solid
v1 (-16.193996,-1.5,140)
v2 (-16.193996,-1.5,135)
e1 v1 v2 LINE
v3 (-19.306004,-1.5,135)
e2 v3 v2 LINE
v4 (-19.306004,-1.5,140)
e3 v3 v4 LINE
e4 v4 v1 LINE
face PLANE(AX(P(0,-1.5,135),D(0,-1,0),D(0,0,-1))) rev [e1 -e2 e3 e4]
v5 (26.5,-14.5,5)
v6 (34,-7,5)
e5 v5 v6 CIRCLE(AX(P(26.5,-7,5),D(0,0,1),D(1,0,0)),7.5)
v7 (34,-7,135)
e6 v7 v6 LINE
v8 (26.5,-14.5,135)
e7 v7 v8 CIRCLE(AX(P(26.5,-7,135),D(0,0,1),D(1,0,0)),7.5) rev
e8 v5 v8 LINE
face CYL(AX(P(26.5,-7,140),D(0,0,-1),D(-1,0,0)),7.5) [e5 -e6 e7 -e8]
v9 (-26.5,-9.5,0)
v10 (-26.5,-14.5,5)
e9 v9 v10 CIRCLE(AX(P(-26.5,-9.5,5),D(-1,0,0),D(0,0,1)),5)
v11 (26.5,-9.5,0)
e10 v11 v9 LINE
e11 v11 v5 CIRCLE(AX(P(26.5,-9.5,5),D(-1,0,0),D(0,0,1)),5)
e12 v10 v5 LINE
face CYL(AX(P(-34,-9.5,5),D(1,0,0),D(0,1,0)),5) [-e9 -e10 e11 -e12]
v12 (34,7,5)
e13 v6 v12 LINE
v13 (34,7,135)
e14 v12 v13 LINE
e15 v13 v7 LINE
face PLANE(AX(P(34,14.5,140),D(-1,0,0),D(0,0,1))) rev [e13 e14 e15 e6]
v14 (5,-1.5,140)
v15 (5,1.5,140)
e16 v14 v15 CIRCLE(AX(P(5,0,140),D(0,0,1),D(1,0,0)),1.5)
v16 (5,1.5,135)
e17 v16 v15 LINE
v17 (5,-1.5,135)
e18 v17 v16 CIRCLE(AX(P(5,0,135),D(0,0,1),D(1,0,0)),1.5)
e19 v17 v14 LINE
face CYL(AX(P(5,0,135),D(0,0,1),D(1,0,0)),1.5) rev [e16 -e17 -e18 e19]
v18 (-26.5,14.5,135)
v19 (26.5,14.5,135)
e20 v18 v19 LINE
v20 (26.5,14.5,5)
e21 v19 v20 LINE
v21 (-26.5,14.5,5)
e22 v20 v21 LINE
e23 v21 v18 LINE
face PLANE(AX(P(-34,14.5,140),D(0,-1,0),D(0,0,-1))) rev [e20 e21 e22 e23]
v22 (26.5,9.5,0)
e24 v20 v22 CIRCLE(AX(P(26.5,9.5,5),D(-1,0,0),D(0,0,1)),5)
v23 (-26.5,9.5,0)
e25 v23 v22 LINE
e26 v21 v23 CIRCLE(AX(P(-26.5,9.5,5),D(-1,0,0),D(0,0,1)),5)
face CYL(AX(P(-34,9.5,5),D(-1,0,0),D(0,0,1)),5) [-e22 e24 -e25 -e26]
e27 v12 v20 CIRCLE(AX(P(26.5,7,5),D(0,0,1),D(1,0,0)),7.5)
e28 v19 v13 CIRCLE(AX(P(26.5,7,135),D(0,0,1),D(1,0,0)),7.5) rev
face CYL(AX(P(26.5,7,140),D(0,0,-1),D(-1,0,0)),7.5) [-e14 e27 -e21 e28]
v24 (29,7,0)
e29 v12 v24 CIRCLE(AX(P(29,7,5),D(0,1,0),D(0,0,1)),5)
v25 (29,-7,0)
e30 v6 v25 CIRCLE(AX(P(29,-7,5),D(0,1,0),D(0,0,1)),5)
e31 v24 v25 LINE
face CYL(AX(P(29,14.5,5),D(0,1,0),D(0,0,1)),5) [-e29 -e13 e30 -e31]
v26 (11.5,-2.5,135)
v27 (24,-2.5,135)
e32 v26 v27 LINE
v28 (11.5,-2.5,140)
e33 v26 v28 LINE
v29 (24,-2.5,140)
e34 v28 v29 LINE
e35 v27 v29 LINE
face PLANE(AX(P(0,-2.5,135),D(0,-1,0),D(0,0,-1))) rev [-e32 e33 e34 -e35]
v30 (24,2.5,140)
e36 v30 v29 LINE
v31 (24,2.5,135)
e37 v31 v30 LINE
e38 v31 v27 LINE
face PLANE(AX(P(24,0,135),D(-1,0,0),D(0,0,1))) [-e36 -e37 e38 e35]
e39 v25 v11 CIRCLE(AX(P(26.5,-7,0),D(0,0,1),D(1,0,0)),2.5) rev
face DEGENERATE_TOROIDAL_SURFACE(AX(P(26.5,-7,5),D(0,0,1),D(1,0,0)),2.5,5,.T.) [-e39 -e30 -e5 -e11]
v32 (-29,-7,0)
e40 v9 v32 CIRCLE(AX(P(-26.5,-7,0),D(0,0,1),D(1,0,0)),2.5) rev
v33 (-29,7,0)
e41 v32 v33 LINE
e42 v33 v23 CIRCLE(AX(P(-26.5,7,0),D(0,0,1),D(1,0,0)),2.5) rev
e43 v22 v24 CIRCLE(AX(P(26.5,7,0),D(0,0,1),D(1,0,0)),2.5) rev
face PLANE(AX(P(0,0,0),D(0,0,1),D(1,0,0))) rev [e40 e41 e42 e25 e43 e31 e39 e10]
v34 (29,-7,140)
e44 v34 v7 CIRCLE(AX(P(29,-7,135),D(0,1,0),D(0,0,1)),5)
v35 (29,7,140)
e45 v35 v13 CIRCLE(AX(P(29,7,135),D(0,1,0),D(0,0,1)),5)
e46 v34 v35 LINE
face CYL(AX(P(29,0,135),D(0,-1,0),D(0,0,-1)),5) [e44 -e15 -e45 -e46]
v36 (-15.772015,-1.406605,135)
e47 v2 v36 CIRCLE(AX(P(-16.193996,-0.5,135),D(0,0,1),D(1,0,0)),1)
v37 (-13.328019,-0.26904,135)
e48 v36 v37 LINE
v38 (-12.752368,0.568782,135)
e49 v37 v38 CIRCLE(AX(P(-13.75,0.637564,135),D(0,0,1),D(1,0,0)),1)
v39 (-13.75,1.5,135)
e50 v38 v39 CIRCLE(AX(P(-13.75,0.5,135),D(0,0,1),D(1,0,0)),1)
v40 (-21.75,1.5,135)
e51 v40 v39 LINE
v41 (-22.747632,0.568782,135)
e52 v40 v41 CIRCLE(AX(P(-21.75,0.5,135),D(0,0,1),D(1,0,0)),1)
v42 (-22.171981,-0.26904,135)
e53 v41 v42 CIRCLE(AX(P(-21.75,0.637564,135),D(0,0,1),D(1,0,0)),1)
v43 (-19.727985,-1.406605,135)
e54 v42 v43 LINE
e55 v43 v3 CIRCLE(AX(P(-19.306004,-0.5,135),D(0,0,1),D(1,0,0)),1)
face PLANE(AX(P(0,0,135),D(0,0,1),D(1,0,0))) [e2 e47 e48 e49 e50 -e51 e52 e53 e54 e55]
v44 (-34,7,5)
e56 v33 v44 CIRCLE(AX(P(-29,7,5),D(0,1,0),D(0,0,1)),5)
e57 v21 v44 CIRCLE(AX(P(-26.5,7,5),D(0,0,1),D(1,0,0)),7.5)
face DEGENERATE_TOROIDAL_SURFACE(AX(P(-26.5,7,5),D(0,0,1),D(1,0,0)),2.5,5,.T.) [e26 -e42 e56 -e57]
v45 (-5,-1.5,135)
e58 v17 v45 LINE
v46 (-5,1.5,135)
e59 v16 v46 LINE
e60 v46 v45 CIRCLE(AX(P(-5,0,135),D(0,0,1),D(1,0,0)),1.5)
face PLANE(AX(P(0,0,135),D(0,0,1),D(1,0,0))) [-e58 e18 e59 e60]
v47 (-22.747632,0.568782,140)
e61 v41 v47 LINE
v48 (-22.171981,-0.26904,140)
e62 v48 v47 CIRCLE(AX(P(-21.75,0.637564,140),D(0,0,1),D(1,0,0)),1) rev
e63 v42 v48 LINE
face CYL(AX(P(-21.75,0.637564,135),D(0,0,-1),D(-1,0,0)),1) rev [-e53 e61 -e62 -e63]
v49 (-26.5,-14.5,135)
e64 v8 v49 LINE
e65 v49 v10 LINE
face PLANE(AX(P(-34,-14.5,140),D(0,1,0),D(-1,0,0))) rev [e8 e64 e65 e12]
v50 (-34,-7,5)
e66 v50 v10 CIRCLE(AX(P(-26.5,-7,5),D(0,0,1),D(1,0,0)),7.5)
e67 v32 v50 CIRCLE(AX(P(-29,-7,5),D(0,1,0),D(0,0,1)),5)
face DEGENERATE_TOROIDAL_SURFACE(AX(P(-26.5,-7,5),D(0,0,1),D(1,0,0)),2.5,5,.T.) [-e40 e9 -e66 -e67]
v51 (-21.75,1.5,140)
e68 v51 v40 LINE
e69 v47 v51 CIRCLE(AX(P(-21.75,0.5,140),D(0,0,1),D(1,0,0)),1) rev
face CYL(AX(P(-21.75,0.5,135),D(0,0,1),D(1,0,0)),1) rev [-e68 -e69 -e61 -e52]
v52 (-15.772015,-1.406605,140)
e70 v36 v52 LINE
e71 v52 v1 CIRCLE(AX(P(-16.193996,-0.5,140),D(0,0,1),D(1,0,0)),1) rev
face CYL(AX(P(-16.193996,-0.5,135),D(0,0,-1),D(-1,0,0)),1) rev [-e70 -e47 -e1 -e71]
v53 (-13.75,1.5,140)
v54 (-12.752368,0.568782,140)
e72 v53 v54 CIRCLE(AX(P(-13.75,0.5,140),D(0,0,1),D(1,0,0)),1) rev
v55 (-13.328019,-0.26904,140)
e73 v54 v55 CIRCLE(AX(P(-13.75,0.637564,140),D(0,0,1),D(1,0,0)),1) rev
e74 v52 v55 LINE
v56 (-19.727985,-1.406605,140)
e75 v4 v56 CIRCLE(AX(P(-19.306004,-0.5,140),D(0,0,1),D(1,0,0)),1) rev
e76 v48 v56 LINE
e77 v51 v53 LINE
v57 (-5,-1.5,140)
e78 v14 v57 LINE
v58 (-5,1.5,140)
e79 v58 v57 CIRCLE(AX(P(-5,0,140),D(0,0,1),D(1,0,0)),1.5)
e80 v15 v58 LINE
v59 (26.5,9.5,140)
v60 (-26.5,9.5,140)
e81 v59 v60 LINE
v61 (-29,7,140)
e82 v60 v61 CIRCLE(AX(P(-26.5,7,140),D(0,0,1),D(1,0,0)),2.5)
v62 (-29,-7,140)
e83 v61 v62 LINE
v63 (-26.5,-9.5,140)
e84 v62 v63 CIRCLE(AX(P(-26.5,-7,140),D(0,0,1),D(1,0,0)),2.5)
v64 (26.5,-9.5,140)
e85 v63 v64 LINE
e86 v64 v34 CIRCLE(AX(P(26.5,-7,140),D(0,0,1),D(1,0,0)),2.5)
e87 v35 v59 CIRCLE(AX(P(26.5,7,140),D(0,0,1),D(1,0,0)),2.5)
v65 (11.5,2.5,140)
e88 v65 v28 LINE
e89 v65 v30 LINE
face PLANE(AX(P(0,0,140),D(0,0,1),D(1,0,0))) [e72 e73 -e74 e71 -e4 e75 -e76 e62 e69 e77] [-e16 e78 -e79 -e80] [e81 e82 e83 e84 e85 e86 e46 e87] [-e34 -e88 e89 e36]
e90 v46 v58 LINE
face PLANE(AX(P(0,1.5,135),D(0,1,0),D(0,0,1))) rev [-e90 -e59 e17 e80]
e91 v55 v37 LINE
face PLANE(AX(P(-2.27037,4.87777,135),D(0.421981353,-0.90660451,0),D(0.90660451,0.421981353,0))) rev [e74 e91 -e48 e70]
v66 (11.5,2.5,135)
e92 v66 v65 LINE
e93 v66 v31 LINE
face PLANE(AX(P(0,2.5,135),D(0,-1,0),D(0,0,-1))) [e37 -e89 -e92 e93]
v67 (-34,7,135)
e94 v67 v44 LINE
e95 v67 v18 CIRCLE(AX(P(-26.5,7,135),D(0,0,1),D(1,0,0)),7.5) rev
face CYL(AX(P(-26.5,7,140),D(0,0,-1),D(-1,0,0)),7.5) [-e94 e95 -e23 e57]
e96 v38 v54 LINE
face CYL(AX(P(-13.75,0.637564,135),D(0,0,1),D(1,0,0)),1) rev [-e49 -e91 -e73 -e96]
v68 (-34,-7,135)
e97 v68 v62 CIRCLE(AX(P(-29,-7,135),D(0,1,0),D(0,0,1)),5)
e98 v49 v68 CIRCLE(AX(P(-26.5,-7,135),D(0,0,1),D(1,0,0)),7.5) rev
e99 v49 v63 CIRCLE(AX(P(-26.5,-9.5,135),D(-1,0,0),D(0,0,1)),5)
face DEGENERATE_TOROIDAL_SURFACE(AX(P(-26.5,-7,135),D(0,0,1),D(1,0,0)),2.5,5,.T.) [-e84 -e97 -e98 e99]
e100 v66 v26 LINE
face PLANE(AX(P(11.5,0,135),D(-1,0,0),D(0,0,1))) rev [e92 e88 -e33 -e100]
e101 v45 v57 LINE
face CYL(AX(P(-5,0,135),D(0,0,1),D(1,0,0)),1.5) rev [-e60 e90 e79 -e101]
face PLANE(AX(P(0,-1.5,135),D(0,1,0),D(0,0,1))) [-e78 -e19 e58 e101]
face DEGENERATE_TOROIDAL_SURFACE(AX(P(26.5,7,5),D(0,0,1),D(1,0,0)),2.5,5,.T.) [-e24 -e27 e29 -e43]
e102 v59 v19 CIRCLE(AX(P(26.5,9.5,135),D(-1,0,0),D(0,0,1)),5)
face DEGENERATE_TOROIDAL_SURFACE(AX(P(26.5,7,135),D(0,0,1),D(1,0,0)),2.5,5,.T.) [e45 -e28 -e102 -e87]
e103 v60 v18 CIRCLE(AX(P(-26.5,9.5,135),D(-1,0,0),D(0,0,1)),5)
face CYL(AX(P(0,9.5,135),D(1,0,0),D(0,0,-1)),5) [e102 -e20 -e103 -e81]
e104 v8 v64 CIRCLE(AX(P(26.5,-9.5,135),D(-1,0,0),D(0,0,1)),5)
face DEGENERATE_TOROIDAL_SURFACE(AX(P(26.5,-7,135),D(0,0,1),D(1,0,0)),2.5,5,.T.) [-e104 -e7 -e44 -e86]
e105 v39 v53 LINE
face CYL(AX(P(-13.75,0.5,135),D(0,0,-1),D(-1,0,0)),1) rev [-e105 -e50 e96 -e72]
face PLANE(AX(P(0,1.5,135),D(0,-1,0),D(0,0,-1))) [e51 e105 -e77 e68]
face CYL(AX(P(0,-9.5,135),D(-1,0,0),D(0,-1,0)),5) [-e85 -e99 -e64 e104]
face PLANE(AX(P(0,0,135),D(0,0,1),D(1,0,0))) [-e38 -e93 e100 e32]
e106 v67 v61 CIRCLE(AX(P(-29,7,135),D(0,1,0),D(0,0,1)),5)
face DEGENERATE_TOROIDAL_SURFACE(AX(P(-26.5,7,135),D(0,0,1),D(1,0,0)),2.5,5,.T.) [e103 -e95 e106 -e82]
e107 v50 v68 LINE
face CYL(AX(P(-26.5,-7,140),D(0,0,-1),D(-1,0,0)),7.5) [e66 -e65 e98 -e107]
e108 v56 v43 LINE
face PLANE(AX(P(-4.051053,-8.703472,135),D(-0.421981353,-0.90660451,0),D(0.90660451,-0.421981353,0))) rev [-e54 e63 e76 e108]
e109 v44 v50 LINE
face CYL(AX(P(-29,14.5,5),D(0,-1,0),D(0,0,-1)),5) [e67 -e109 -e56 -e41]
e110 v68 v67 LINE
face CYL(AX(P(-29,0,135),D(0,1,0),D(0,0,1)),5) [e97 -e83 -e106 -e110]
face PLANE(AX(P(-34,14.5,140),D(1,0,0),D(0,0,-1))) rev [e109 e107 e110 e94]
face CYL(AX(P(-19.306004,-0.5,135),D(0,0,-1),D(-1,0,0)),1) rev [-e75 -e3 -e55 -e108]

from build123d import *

# Parameters (mm, degrees)
ESQUISSE1_W             = 68
ESQUISSE1_H             = 29
BOSS_EXTRU_1_DEPTH      = 140
CONG_1_R                = 7.5
CONG_2_R                = 5
ESQUISSE2_W             = 12.5
ESQUISSE2_H             = 5
ENL_V_MAT_EXTRU_1_DEPTH = 5
CONG_3_R                = 1


with BuildPart() as part:
    # Esquisse1 → Boss.-Extru.1 (new body)
    with BuildSketch(Plane.XY):
        Rectangle(ESQUISSE1_W, ESQUISSE1_H)
    extrude(amount=BOSS_EXTRU_1_DEPTH)

    # Congé1
    cong_1_edges = [part.edges().sort_by_distance(p)[0] for p in [
        (-34, 14.5, 70),
        (34, 14.5, 70),
        (34, -14.5, 70),
        (-34, -14.5, 70),
    ]]
    fillet(cong_1_edges, radius=CONG_1_R)

    # Congé2
    cong_2_edges = [part.edges().sort_by_distance(p)[0] for p in [
        (34, 0, 0),
        (34, 0, 140),
        (-34, 0, 0),
        (0, 14.5, 0),
        (0, -14.5, 0),
        (-31.803300859, 12.303300859, 0),
        (-31.803300859, -12.303300859, 0),
        (31.803300859, 12.303300859, 0),
        (31.803300859, -12.303300859, 0),
        (0, -14.5, 140),
        (-34, 0, 140),
        (0, 14.5, 140),
        (-31.803300859, 12.303300859, 140),
        (-31.803300859, -12.303300859, 140),
        (31.803300859, 12.303300859, 140),
        (31.803300859, -12.303300859, 140),
    ]]
    fillet(cong_2_edges, radius=CONG_2_R)

    # Esquisse2 → Enlèv. mat.-Extru.1 (cut)
    with BuildSketch(Plane.XY.offset(140)):
        Polygon((-12.75, 1.5), (-22.75, 1.5), (-22.75, 0), (-19.52732972, -1.5), (-15.97267028, -1.5), (-12.75, 0), align=None)
        with BuildLine():
            Line((5, 1.5), (-5, 1.5))
            ThreePointArc((-5, 1.5), (-6.5, 0), (-5, -1.5))
            Line((-5, -1.5), (5, -1.5))
            ThreePointArc((5, -1.5), (6.5, 0), (5, 1.5))
        make_face()
        with Locations((17.75, 0)):
            Rectangle(ESQUISSE2_W, ESQUISSE2_H)
    extrude(amount=-ENL_V_MAT_EXTRU_1_DEPTH, mode=Mode.SUBTRACT)

    # Congé3
    # the kernel refuses this fillet: 1 mm, written as the material it adds along each edge
    with BuildSketch(Plane(origin=(-15.97267028, -1.5, 140), x_dir=(0.9066045100812768, 0.4219813530243817, 0), z_dir=(0, 0, -1)), Plane(origin=(-19.52732972, -1.5, 140), x_dir=(1, 0, 0), z_dir=(0, 0, -1))) as cong_3_piece_1:
        with BuildLine():
            CenterArc((CONG_3_R * 0.221326106591, -CONG_3_R), CONG_3_R, 90, 24.959741925)
            Line((-CONG_3_R * 0.200655246434, -CONG_3_R * 0.0933954899187), (0, 0))
            Line((0, 0), (CONG_3_R * 0.221326106591, 0))
        make_face()
    extrude(amount=5.553315266)
    with BuildSketch(Plane(origin=(-22.75, 0, 140), x_dir=(0.9066045100812758, -0.42198135302438383, 0), z_dir=(0, 0, -1))) as cong_3_piece_2:
        with BuildLine():
            CenterArc((CONG_3_R * 0.637564274773, -CONG_3_R), CONG_3_R, 90, 65.040258075)
            Line((-CONG_3_R * 0.269040235309, -CONG_3_R * 0.578018646976), (0, 0))
            Line((0, 0), (CONG_3_R * 0.637564274773, 0))
        make_face()
    extrude(amount=6.593910687)
    with BuildSketch(Plane(origin=(-22.75, 1.5, 140), x_dir=(0, -1, 0), z_dir=(0, 0, -1)), Plane(origin=(-12.75, 1.5, 140), x_dir=(-1, 0, 0), z_dir=(0, 0, -1))) as cong_3_piece_3:
        with BuildLine():
            CenterArc((CONG_3_R, -CONG_3_R), CONG_3_R, 90, 90)
            Line((0, -CONG_3_R), (0, 0))
            Line((0, 0), (CONG_3_R, 0))
        make_face()
    extrude(amount=7.5)
    with BuildSketch(Plane(origin=(-12.75, 0, 140), x_dir=(-0.906604510081276, -0.4219813530243839, 0), z_dir=(0, 0, -1))) as cong_3_piece_4:
        with BuildLine():
            CenterArc((CONG_3_R * 0.637564274773, CONG_3_R), CONG_3_R, 204.959741925, 65.040258075)
            Line((-CONG_3_R * 0.269040235309, CONG_3_R * 0.578018646976), (0, 0))
            Line((0, 0), (CONG_3_R * 0.637564274773, 0))
        make_face()
    extrude(amount=6.593910687)


solid = part.part
